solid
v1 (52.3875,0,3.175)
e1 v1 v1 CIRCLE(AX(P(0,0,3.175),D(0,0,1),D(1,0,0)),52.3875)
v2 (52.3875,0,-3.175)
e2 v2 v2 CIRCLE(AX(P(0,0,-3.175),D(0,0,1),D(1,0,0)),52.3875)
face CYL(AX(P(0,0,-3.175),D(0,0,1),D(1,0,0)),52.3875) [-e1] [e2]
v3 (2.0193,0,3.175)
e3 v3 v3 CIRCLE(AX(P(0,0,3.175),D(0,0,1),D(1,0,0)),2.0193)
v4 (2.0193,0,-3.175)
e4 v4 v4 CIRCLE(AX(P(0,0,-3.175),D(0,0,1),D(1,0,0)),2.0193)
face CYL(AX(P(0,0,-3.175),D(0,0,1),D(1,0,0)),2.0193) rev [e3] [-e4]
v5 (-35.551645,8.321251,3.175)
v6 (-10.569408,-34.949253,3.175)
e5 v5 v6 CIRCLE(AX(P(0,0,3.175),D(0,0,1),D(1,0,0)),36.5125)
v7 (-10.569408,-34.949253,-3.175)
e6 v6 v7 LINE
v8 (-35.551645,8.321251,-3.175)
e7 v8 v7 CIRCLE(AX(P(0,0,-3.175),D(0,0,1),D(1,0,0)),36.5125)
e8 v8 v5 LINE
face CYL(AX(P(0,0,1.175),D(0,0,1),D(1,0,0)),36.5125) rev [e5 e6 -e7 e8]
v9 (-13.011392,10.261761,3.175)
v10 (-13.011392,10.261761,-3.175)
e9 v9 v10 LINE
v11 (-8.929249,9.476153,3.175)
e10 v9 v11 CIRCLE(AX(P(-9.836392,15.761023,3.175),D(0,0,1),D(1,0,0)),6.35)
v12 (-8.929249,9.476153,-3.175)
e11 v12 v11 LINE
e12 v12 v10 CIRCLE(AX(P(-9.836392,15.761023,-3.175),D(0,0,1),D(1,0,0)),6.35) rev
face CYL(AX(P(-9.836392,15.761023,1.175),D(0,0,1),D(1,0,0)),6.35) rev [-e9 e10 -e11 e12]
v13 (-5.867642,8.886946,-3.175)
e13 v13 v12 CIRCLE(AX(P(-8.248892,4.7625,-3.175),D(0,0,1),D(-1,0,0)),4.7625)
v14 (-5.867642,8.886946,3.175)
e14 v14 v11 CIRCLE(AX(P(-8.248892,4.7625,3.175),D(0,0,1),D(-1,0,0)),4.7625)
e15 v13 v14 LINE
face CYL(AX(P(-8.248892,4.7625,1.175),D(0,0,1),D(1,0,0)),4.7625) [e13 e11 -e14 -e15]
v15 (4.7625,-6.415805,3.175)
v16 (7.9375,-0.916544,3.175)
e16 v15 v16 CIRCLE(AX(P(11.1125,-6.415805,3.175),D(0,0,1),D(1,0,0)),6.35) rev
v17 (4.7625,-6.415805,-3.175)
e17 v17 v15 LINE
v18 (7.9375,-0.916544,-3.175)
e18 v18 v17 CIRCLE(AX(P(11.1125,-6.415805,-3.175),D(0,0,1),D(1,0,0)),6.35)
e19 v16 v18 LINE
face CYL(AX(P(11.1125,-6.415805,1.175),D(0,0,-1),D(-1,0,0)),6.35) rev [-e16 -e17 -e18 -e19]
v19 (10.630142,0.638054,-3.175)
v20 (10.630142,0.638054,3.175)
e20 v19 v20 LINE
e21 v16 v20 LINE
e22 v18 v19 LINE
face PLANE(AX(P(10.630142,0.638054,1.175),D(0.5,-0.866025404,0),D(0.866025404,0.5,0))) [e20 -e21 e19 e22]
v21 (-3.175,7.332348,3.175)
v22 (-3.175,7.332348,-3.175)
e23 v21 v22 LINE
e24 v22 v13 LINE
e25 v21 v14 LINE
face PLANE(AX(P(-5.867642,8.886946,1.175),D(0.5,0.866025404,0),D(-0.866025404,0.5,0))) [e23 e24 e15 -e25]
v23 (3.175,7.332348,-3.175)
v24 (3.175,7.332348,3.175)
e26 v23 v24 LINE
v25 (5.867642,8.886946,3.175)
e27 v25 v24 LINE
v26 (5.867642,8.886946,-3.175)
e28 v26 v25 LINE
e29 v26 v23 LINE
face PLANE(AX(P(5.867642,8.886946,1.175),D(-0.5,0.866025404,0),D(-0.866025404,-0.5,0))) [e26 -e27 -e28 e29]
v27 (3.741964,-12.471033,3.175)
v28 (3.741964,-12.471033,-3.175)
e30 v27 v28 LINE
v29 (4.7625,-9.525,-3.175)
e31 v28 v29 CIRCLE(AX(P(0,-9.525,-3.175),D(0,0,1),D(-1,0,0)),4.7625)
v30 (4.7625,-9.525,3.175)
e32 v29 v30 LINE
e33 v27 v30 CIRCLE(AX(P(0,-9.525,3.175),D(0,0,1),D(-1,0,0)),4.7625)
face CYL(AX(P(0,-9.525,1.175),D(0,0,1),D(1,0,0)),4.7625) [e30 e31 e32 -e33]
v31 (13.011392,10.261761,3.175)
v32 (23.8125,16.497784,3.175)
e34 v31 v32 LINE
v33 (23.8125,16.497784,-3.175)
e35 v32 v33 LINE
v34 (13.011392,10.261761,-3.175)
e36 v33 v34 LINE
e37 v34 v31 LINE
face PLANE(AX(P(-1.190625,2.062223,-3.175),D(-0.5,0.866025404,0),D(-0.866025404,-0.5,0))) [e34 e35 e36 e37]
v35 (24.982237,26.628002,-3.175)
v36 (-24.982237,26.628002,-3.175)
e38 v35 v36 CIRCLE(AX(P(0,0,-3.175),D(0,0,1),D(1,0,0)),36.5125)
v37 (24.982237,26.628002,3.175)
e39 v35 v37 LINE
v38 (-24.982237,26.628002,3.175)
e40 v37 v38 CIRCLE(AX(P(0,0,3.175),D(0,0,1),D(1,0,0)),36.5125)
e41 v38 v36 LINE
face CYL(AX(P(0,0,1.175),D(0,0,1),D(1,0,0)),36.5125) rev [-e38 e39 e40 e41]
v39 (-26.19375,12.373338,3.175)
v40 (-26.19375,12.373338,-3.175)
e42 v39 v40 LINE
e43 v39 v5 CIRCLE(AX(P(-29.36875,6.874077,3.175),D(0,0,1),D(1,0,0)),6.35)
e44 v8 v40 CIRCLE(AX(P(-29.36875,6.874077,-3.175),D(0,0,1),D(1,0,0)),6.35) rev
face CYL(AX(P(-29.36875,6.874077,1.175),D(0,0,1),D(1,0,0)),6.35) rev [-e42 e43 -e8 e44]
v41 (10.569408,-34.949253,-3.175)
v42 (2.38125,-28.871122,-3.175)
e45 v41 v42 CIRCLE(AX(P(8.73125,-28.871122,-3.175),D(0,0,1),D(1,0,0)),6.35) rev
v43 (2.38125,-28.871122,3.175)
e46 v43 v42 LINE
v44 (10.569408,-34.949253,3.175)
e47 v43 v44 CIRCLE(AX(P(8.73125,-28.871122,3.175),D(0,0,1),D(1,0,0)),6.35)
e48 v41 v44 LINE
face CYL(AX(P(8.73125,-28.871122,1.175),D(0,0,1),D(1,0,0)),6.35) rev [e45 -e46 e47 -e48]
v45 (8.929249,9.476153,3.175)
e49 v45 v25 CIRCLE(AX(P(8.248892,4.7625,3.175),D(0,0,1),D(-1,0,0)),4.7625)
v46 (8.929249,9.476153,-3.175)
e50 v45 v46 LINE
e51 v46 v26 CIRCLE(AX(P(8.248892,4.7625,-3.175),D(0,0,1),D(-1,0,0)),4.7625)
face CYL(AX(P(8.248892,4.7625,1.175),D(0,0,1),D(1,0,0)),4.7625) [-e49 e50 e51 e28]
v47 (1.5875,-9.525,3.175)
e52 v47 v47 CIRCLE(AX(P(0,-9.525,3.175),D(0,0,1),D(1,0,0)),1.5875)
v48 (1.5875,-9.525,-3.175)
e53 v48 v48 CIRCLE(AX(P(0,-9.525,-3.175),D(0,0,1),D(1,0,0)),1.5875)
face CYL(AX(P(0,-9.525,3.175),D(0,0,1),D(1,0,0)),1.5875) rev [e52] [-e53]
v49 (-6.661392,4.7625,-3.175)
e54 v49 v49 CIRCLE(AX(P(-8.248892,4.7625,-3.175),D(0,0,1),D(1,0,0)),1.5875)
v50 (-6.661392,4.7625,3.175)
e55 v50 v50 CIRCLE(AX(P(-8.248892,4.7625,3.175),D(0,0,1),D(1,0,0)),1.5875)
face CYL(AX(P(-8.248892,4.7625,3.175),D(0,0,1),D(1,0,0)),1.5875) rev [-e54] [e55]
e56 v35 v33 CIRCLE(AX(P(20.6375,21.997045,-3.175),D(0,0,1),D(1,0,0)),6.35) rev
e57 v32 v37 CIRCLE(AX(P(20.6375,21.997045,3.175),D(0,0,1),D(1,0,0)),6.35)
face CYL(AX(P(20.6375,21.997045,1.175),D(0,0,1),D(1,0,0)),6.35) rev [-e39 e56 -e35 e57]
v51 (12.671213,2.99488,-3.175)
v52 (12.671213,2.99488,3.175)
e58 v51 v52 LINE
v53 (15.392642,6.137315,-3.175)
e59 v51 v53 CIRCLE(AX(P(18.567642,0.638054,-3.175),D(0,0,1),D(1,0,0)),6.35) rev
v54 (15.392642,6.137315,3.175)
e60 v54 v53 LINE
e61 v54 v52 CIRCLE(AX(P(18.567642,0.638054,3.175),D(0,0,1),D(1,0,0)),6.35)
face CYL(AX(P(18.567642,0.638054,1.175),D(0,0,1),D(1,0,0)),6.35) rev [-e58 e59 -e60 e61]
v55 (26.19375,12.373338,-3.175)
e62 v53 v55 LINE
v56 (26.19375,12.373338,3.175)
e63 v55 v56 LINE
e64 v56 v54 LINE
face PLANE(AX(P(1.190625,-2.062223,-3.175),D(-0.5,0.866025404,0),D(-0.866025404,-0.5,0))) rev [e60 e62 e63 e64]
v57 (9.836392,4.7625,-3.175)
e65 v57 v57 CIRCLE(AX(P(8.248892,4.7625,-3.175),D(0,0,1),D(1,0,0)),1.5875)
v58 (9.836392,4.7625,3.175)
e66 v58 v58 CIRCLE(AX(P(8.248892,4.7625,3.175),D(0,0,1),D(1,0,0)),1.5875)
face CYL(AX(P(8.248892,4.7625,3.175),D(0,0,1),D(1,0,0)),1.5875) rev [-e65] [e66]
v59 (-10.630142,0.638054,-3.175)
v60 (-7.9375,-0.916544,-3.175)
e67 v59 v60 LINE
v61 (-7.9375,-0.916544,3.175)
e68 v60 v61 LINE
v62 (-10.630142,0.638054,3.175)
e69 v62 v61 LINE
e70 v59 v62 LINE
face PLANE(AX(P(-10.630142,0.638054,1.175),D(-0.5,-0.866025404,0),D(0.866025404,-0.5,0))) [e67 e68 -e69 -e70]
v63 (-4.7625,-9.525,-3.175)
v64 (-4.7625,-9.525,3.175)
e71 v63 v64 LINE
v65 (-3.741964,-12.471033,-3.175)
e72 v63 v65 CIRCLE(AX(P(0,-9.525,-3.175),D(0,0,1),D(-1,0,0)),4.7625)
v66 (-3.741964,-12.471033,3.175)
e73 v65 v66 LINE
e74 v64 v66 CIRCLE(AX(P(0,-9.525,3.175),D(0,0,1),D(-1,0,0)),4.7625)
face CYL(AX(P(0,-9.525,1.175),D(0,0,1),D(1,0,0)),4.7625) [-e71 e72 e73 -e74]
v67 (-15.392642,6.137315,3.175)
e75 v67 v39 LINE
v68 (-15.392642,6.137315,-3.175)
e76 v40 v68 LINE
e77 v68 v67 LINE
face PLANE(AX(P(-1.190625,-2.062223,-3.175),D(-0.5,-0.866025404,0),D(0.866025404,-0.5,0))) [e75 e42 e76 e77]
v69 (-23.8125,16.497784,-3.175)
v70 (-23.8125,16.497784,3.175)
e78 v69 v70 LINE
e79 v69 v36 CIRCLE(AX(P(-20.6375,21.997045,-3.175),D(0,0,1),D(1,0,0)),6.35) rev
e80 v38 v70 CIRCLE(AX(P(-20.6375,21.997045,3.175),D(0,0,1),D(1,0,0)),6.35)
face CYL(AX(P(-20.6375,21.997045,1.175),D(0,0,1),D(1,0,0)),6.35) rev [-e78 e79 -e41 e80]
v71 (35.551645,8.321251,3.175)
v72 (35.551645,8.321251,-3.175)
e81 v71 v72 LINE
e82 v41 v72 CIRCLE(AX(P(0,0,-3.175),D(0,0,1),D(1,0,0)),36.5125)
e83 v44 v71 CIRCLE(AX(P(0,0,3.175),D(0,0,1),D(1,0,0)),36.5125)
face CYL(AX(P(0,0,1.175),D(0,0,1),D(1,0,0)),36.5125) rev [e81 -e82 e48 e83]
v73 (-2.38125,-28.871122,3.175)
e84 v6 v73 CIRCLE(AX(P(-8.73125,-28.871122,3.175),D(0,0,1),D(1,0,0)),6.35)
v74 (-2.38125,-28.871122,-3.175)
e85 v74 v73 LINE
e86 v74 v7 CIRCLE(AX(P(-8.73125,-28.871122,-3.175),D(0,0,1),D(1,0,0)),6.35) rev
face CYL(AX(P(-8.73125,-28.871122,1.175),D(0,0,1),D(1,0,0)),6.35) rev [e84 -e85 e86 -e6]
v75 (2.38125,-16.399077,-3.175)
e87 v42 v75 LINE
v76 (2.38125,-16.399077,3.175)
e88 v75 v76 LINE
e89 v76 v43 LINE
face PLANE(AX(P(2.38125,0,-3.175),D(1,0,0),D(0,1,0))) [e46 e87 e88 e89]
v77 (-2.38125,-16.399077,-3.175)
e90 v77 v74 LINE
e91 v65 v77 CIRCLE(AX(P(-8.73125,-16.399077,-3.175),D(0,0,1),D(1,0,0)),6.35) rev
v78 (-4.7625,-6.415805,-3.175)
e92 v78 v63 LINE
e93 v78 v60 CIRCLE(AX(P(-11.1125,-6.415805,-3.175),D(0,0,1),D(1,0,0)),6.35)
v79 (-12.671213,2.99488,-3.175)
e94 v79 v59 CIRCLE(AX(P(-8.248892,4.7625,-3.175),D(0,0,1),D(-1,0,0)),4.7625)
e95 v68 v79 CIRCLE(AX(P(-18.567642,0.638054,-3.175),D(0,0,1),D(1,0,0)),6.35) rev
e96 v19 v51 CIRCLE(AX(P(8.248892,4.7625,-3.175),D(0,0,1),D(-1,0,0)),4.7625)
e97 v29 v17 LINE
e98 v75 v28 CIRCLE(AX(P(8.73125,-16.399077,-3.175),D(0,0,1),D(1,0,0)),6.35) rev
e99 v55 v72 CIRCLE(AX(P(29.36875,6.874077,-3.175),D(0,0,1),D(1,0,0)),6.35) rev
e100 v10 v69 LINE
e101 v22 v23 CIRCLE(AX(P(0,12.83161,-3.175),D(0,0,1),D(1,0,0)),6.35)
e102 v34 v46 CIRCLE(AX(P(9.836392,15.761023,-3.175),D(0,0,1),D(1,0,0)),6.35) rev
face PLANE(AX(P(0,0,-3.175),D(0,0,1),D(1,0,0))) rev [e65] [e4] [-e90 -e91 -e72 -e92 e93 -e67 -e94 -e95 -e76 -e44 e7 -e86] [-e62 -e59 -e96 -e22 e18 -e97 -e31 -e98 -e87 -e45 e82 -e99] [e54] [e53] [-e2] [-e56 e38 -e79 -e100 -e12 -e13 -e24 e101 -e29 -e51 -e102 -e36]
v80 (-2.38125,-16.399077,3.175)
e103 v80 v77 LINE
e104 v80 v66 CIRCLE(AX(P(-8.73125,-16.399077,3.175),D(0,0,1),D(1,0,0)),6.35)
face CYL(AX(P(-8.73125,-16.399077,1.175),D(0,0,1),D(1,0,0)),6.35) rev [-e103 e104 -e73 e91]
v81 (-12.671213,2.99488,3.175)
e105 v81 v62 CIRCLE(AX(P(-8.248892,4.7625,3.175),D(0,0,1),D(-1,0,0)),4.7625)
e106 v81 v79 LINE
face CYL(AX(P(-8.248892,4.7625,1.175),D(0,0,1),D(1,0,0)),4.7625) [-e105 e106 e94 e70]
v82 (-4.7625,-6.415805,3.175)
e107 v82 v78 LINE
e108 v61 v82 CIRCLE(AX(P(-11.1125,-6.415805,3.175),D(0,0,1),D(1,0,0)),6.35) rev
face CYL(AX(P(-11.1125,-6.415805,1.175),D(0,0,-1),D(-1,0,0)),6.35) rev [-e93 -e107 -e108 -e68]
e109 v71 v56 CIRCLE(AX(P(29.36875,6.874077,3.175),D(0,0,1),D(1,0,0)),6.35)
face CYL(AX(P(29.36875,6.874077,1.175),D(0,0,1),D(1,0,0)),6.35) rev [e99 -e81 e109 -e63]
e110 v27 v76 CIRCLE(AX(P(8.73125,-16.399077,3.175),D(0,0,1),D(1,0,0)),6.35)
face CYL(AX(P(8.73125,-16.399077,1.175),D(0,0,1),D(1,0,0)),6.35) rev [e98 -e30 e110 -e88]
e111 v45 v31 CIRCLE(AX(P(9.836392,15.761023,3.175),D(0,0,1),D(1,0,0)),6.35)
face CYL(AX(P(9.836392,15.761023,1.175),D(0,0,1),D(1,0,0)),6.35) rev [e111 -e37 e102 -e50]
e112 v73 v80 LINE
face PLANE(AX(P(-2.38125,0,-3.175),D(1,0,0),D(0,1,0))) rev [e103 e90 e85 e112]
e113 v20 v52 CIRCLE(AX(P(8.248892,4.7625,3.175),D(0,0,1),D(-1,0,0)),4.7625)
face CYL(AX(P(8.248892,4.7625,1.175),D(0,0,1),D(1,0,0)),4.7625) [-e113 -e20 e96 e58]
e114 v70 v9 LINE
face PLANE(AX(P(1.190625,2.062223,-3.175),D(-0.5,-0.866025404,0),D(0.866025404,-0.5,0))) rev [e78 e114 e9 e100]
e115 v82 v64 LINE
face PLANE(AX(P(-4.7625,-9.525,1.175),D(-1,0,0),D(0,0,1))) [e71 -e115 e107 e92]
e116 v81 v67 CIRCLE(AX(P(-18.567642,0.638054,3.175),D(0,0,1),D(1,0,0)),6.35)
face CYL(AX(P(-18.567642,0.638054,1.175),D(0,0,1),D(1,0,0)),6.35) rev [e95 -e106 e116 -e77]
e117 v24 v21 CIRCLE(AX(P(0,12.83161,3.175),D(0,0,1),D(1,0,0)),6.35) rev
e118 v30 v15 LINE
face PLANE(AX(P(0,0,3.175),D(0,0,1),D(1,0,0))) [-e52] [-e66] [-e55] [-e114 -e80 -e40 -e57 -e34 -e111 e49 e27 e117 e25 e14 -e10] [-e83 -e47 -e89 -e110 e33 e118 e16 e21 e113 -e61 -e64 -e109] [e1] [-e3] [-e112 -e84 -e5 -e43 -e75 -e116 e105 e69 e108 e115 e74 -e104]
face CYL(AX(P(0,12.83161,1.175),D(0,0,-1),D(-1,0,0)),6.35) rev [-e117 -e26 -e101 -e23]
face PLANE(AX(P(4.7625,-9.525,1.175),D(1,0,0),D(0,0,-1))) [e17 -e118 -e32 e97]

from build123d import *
from build123d.topology import SkipClean

# Parameters (mm, degrees)
BOSS_EXTRUDE1_DEPTH              = 3.175
BOSS_EXTRUDE1_DEPTH_BACK         = 3.175
SKETCH1_R                        = 52.3875
SKETCH1_R_2                      = 2.0193
SHAFT_COUPLER_BOLT_D             = 3.175
SHAFT_COUPLER_BOLT_PATTERN_COUNT = 3
SKETCH6_R                        = 36.5125
CUT_EXTRUDE2_DEPTH               = 2
VOID_CUT_DEPTH                   = 75.214707521
VOID_CUT_DEPTH_BACK              = 75.214707521
TOOLING_RADIUS_R                 = 6.35
BOSS_EXTRUDE2_START              = -4.35
BOSS_EXTRUDE2_DEPTH              = 6.35


# Read off the part's stored shape, not the designer's step: Boss-Extrude2
with BuildPart() as part:
    # Sketch1 → Boss-Extrude1 (new, two sides: drawn at the far end of the back side and taken through both)
    with BuildSketch(Plane.XY.offset(-BOSS_EXTRUDE1_DEPTH_BACK)):
        Circle(SKETCH1_R)
        Circle(SKETCH1_R_2, mode=Mode.SUBTRACT)
    extrude(amount=BOSS_EXTRUDE1_DEPTH + BOSS_EXTRUDE1_DEPTH_BACK)

    # SHAFT-COUPLER-BOLT (through all)
    with Locations(Plane.XY.offset(3.175)):
        with Locations((0, -9.525)):
            shaft_coupler_bolt = Hole(SHAFT_COUPLER_BOLT_D / 2)

    # SHAFT-COUPLER-BOLT-PATTERN: SHAFT-COUPLER-BOLT ×3 about axis
    shaft_coupler_bolt_pattern_axis = Axis((0, 0, 0), (0, 0, 1))
    for i in range(1, SHAFT_COUPLER_BOLT_PATTERN_COUNT):
        add(shaft_coupler_bolt.rotate(shaft_coupler_bolt_pattern_axis, i * 360 / SHAFT_COUPLER_BOLT_PATTERN_COUNT), mode=Mode.SUBTRACT)

    # Sketch6 → Cut-Extrude2 (cut)
    with BuildSketch(Plane.XY.offset(3.175)):
        Circle(SKETCH6_R)
        with BuildLine():
            Line((4.7625, -9.525), (4.7625, -2.749630657))
            Line((4.7625, -2.749630657), (10.630141971, 0.638054014))
            ThreePointArc((10.630141971, 0.638054014), (12.373337957, 7.14375), (5.867641971, 8.886945986))
            Line((5.867641971, 8.886945986), (0, 5.499261314))
            Line((0, 5.499261314), (-5.867641971, 8.886945986))
            ThreePointArc((-5.867641971, 8.886945986), (-12.373337957, 7.14375), (-10.630141971, 0.638054014))
            Line((-10.630141971, 0.638054014), (-4.7625, -2.749630657))
            Line((-4.7625, -2.749630657), (-4.7625, -9.525))
            ThreePointArc((-4.7625, -9.525), (0, -14.2875), (4.7625, -9.525))
        make_face(mode=Mode.SUBTRACT)
    cut_extrude2 = extrude(amount=-CUT_EXTRUDE2_DEPTH, mode=Mode.SUBTRACT)

    # Mirror1: Cut-Extrude2 across plane
    add(cut_extrude2.mirror(Plane.XY), mode=Mode.SUBTRACT)

    # Sketch7 → VOID-CUT (cut, two sides: drawn at the far end of the back side and taken through both)
    with BuildSketch(Plane.XY.offset(1.175).offset(-VOID_CUT_DEPTH_BACK)):
        with BuildLine():
            Line((2.38125, -13.649445986), (2.38125, -36.434767801))
            ThreePointArc((2.38125, -36.434767801), (26.646838901, -24.962143995), (36.5125, 0))
            ThreePointArc((36.5125, 0), (35.557911417, 8.294431382), (32.744059496, 16.155160908))
            Line((32.744059496, 16.155160908), (13.011391971, 4.7625))
            ThreePointArc((13.011391971, 4.7625), (12.373337957, 2.38125), (10.630141971, 0.638054014))
            Line((10.630141971, 0.638054014), (4.7625, -2.749630657))
            Line((4.7625, -2.749630657), (4.7625, -9.525))
            ThreePointArc((4.7625, -9.525), (4.124445986, -11.90625), (2.38125, -13.649445986))
        make_face()
        with BuildLine():
            ThreePointArc((-32.744059496, 16.155160908), (-31.620752556, -18.25625), (-2.38125, -36.434767801))
            Line((-2.38125, -36.434767801), (-2.38125, -13.649445986))
            ThreePointArc((-2.38125, -13.649445986), (-4.124445986, -11.90625), (-4.7625, -9.525))
            Line((-4.7625, -9.525), (-4.7625, -2.749630657))
            Line((-4.7625, -2.749630657), (-10.630141971, 0.638054014))
            ThreePointArc((-10.630141971, 0.638054014), (-12.373337957, 2.38125), (-13.011391971, 4.7625))
            Line((-13.011391971, 4.7625), (-32.744059496, 16.155160908))
        make_face()
        with BuildLine():
            ThreePointArc((30.362809496, 20.279606893), (0, 36.5125), (-30.362809496, 20.279606893))
            Line((-30.362809496, 20.279606893), (-10.630141971, 8.886945986))
            ThreePointArc((-10.630141971, 8.886945986), (-8.248891971, 9.525), (-5.867641971, 8.886945986))
            Line((-5.867641971, 8.886945986), (0, 5.499261314))
            Line((0, 5.499261314), (5.867641971, 8.886945986))
            ThreePointArc((5.867641971, 8.886945986), (8.248891971, 9.525), (10.630141971, 8.886945986))
            Line((10.630141971, 8.886945986), (30.362809496, 20.279606893))
        make_face()
    extrude(amount=VOID_CUT_DEPTH + VOID_CUT_DEPTH_BACK, mode=Mode.SUBTRACT)

    # TOOLING-RADIUS
    # the kernel refuses this fillet: 6.35 mm, written as the material it adds along each edge
    with BuildSketch(Plane(origin=(32.744059496, 16.155160908, 1.175), x_dir=(0.3373763569350217, -0.9413698496240746, 0), z_dir=(0, 0, -1)), Plane(origin=(30.362809496, 20.279606893, -1.175), x_dir=(-0.6465620256636754, 0.7628614205540117, 0), z_dir=(0, 0, 1)), Plane(origin=(-32.744059496, 16.155160908, -1.175), x_dir=(-0.3373763569350221, -0.9413698496240744, 0), z_dir=(0, 0, 1)), Plane(origin=(-2.38125, -36.434767801, 1.175), x_dir=(-0.9839383825986964, 0.17850842907006217, 0), z_dir=(0, 0, -1))) as tooling_radius_piece_1:
        with BuildLine():
            CenterArc((7.598183278, 6.308632991), TOOLING_RADIUS_R, 169.717107938, 106.826448893)
            Line((1.350174548, 7.442161515), (0, 0))
            ThreePointArc((0, 0), (4.16090989, -0.237860303), (8.32181978, 0))
        make_face()
    extrude(amount=2.35)
    with BuildSketch(Plane(origin=(2.38125, -36.434767801, 1.175), x_dir=(0.9839383825986963, 0.17850842907006276, 0), z_dir=(0, 0, -1)), Plane(origin=(-30.362809496, 20.279606893, -1.175), x_dir=(0.6465620256636744, 0.7628614205540126, 0), z_dir=(0, 0, 1))) as tooling_radius_piece_2:
        with BuildLine():
            CenterArc((7.598183278, -6.308632991), TOOLING_RADIUS_R, 83.456443169, 106.826448893)
            Line((1.350174548, -7.442161515), (0, 0))
            ThreePointArc((0, 0), (4.16090989, 0.237860303), (8.32181978, 0))
        make_face()
    extrude(amount=2.35)
    with BuildSketch(Plane(origin=(2.38125, -13.649445986, -1.175), x_dir=(0, -1, 0), z_dir=(0, 0, 1)), Plane(origin=(13.011391971, 4.7625, 1.175), x_dir=(0.866025403784439, 0.4999999999999993, 0), z_dir=(0, 0, -1)), Plane(origin=(-13.011391971, 4.7625, -1.175), x_dir=(-0.8660254037844386, 0.5000000000000001, 0), z_dir=(0, 0, 1)), Plane(origin=(-2.38125, -13.649445986, 1.175), x_dir=(0, -1, 0), z_dir=(0, 0, -1))) as tooling_radius_piece_3:
        with BuildLine():
            CenterArc((2.749630657, 6.35), TOOLING_RADIUS_R, 231.786789298, 38.213210702)
            ThreePointArc((-1.178413139, 1.360714286), (-0.52433438, 0.736538107), (0, 0))
            Line((0, 0), (2.749630657, 0))
        make_face()
    extrude(amount=2.35)
    with BuildSketch(Plane(origin=(10.630141971, 8.886945986, 1.175), x_dir=(0.8660254037844393, 0.4999999999999988, 0), z_dir=(0, 0, -1)), Plane(origin=(-10.630141971, 8.886945986, -1.175), x_dir=(-0.8660254037844384, 0.5000000000000004, 0), z_dir=(0, 0, 1))) as tooling_radius_piece_4:
        with BuildLine():
            CenterArc((2.749630657, -6.35), TOOLING_RADIUS_R, 90, 38.213210702)
            ThreePointArc((-1.178413139, -1.360714286), (-0.52433438, -0.736538107), (0, 0))
            Line((0, 0), (2.749630657, 0))
        make_face()
    extrude(amount=2.35)
    with BuildSketch(Plane(origin=(-4.7625, -2.749630657, -1.175), x_dir=(-0.8660254037844364, 0.5000000000000039, 0), z_dir=(0, 0, 1)), Plane(origin=(4.7625, -2.749630657, -1.175), x_dir=(0, -1, 0), z_dir=(0, 0, 1))) as tooling_radius_piece_5:
        with BuildLine():
            CenterArc((TOOLING_RADIUS_R * 0.57735026919, TOOLING_RADIUS_R), TOOLING_RADIUS_R, 210, 60)
            Line((-TOOLING_RADIUS_R * 0.288675134595, TOOLING_RADIUS_R * 0.5), (0, 0))
            Line((0, 0), (TOOLING_RADIUS_R * 0.57735026919, 0))
        make_face()
    extrude(amount=2.35)
    with BuildSketch(Plane(origin=(0, 5.499261314, 1.175), x_dir=(0.8660254037844363, 0.5000000000000041, 0), z_dir=(0, 0, -1))) as tooling_radius_piece_6:
        with BuildLine():
            CenterArc((TOOLING_RADIUS_R * 0.57735026919, -TOOLING_RADIUS_R), TOOLING_RADIUS_R, 90, 60)
            Line((-TOOLING_RADIUS_R * 0.288675134595, -TOOLING_RADIUS_R * 0.5), (0, 0))
            Line((0, 0), (TOOLING_RADIUS_R * 0.57735026919, 0))
        make_face()
    extrude(amount=2.35)
    with BuildSketch(Plane(origin=(4.7625, -2.749630657, -3.175), x_dir=(0.8660254037844362, 0.5000000000000043, 0), z_dir=(0, 0, 1)), Plane(origin=(0, 5.499261314, -3.175), x_dir=(-0.8660254037844383, 0.5000000000000009, 0), z_dir=(0, 0, 1)), Plane(origin=(-4.7625, -2.749630657, -3.175), x_dir=(0, -1, 0), z_dir=(0, 0, 1))) as tooling_radius_piece_7:
        with BuildLine():
            CenterArc((TOOLING_RADIUS_R * 0.57735026919, -TOOLING_RADIUS_R), TOOLING_RADIUS_R, 90, 60)
            Line((-TOOLING_RADIUS_R * 0.288675134595, -TOOLING_RADIUS_R * 0.5), (0, 0))
            Line((0, 0), (TOOLING_RADIUS_R * 0.57735026919, 0))
        make_face()
    extrude(amount=2)
    with BuildSketch(Plane(origin=(4.7625, -2.749630657, 3.175), x_dir=(0.8660254037844362, 0.5000000000000043, 0), z_dir=(0, 0, -1)), Plane(origin=(0, 5.499261314, 3.175), x_dir=(-0.8660254037844383, 0.5000000000000009, 0), z_dir=(0, 0, -1)), Plane(origin=(-4.7625, -2.749630657, 3.175), x_dir=(0, -1, 0), z_dir=(0, 0, -1))) as tooling_radius_piece_8:
        with BuildLine():
            CenterArc((TOOLING_RADIUS_R * 0.57735026919, TOOLING_RADIUS_R), TOOLING_RADIUS_R, 210, 60)
            Line((-TOOLING_RADIUS_R * 0.288675134595, TOOLING_RADIUS_R * 0.5), (0, 0))
            Line((0, 0), (TOOLING_RADIUS_R * 0.57735026919, 0))
        make_face()
    extrude(amount=2)

    # Boss-Extrude2 outline → Boss-Extrude2 (add)
    with SkipClean():  # the faces are left unmerged after this step: merging them gives an invalid solid
        with BuildSketch(Plane(origin=(0, 0, -1.175), x_dir=(-1, 0, 0), z_dir=(0, 0, -1)).offset(BOSS_EXTRUDE2_START)):
            with BuildLine():
                ThreePointArc((-3.741964286, -12.471032847), (-2.731063991, -14.320551238), (-2.38125, -16.399076643))
                Line((-2.38125, -16.399076643), (-2.38125, -28.871121899))
                ThreePointArc((-2.38125, -28.871121899), (-4.94639879, -33.969886584), (-10.569407895, -34.949252825))
                ThreePointArc((-10.569407895, -34.949252825), (0, -36.5125), (10.569407895, -34.949252825))
                ThreePointArc((10.569407895, -34.949252825), (4.94639879, -33.969886584), (2.38125, -28.871121899))
                Line((2.38125, -28.871121899), (2.38125, -16.399076643))
                ThreePointArc((2.38125, -16.399076643), (2.731063991, -14.320551238), (3.741964286, -12.471032847))
                ThreePointArc((3.741964286, -12.471032847), (0, -14.2875), (-3.741964286, -12.471032847))
            make_face()
            with BuildLine():
                ThreePointArc((-24.982236842, 26.628002152), (-31.620752556, 18.25625), (-35.551644737, 8.321250673))
                ThreePointArc((-35.551644737, 8.321250673), (-31.89198414, 12.701236283), (-26.19375, 12.373337957))
                Line((-26.19375, 12.373337957), (-15.392641971, 6.137315329))
                ThreePointArc((-15.392641971, 6.137315329), (-13.767493164, 4.795104823), (-12.6712134, 2.994880292))
                ThreePointArc((-12.6712134, 2.994880292), (-12.373337957, 7.14375), (-8.929249114, 9.476152555))
                ThreePointArc((-8.929249114, 9.476152555), (-11.036429173, 9.525446415), (-13.011391971, 10.261761314))
                Line((-13.011391971, 10.261761314), (-23.8125, 16.497783942))
                ThreePointArc((-23.8125, 16.497783942), (-26.945585351, 21.268650301), (-24.982236842, 26.628002152))
            make_face()
            with BuildLine():
                ThreePointArc((35.551644737, 8.321250673), (31.620752556, 18.25625), (24.982236842, 26.628002152))
                ThreePointArc((24.982236842, 26.628002152), (26.945585351, 21.268650301), (23.8125, 16.497783942))
                Line((23.8125, 16.497783942), (13.011391971, 10.261761314))
                ThreePointArc((13.011391971, 10.261761314), (11.036429173, 9.525446415), (8.929249114, 9.476152555))
                ThreePointArc((8.929249114, 9.476152555), (12.373337957, 7.14375), (12.6712134, 2.994880292))
                ThreePointArc((12.6712134, 2.994880292), (13.767493164, 4.795104823), (15.392641971, 6.137315329))
                Line((15.392641971, 6.137315329), (26.19375, 12.373337957))
                ThreePointArc((26.19375, 12.373337957), (31.89198414, 12.701236283), (35.551644737, 8.321250673))
            make_face()
        extrude(amount=BOSS_EXTRUDE2_DEPTH)
    add(part.part.scale(1), mode=Mode.REPLACE)  # the faces are merged on a copy


solid = part.part
